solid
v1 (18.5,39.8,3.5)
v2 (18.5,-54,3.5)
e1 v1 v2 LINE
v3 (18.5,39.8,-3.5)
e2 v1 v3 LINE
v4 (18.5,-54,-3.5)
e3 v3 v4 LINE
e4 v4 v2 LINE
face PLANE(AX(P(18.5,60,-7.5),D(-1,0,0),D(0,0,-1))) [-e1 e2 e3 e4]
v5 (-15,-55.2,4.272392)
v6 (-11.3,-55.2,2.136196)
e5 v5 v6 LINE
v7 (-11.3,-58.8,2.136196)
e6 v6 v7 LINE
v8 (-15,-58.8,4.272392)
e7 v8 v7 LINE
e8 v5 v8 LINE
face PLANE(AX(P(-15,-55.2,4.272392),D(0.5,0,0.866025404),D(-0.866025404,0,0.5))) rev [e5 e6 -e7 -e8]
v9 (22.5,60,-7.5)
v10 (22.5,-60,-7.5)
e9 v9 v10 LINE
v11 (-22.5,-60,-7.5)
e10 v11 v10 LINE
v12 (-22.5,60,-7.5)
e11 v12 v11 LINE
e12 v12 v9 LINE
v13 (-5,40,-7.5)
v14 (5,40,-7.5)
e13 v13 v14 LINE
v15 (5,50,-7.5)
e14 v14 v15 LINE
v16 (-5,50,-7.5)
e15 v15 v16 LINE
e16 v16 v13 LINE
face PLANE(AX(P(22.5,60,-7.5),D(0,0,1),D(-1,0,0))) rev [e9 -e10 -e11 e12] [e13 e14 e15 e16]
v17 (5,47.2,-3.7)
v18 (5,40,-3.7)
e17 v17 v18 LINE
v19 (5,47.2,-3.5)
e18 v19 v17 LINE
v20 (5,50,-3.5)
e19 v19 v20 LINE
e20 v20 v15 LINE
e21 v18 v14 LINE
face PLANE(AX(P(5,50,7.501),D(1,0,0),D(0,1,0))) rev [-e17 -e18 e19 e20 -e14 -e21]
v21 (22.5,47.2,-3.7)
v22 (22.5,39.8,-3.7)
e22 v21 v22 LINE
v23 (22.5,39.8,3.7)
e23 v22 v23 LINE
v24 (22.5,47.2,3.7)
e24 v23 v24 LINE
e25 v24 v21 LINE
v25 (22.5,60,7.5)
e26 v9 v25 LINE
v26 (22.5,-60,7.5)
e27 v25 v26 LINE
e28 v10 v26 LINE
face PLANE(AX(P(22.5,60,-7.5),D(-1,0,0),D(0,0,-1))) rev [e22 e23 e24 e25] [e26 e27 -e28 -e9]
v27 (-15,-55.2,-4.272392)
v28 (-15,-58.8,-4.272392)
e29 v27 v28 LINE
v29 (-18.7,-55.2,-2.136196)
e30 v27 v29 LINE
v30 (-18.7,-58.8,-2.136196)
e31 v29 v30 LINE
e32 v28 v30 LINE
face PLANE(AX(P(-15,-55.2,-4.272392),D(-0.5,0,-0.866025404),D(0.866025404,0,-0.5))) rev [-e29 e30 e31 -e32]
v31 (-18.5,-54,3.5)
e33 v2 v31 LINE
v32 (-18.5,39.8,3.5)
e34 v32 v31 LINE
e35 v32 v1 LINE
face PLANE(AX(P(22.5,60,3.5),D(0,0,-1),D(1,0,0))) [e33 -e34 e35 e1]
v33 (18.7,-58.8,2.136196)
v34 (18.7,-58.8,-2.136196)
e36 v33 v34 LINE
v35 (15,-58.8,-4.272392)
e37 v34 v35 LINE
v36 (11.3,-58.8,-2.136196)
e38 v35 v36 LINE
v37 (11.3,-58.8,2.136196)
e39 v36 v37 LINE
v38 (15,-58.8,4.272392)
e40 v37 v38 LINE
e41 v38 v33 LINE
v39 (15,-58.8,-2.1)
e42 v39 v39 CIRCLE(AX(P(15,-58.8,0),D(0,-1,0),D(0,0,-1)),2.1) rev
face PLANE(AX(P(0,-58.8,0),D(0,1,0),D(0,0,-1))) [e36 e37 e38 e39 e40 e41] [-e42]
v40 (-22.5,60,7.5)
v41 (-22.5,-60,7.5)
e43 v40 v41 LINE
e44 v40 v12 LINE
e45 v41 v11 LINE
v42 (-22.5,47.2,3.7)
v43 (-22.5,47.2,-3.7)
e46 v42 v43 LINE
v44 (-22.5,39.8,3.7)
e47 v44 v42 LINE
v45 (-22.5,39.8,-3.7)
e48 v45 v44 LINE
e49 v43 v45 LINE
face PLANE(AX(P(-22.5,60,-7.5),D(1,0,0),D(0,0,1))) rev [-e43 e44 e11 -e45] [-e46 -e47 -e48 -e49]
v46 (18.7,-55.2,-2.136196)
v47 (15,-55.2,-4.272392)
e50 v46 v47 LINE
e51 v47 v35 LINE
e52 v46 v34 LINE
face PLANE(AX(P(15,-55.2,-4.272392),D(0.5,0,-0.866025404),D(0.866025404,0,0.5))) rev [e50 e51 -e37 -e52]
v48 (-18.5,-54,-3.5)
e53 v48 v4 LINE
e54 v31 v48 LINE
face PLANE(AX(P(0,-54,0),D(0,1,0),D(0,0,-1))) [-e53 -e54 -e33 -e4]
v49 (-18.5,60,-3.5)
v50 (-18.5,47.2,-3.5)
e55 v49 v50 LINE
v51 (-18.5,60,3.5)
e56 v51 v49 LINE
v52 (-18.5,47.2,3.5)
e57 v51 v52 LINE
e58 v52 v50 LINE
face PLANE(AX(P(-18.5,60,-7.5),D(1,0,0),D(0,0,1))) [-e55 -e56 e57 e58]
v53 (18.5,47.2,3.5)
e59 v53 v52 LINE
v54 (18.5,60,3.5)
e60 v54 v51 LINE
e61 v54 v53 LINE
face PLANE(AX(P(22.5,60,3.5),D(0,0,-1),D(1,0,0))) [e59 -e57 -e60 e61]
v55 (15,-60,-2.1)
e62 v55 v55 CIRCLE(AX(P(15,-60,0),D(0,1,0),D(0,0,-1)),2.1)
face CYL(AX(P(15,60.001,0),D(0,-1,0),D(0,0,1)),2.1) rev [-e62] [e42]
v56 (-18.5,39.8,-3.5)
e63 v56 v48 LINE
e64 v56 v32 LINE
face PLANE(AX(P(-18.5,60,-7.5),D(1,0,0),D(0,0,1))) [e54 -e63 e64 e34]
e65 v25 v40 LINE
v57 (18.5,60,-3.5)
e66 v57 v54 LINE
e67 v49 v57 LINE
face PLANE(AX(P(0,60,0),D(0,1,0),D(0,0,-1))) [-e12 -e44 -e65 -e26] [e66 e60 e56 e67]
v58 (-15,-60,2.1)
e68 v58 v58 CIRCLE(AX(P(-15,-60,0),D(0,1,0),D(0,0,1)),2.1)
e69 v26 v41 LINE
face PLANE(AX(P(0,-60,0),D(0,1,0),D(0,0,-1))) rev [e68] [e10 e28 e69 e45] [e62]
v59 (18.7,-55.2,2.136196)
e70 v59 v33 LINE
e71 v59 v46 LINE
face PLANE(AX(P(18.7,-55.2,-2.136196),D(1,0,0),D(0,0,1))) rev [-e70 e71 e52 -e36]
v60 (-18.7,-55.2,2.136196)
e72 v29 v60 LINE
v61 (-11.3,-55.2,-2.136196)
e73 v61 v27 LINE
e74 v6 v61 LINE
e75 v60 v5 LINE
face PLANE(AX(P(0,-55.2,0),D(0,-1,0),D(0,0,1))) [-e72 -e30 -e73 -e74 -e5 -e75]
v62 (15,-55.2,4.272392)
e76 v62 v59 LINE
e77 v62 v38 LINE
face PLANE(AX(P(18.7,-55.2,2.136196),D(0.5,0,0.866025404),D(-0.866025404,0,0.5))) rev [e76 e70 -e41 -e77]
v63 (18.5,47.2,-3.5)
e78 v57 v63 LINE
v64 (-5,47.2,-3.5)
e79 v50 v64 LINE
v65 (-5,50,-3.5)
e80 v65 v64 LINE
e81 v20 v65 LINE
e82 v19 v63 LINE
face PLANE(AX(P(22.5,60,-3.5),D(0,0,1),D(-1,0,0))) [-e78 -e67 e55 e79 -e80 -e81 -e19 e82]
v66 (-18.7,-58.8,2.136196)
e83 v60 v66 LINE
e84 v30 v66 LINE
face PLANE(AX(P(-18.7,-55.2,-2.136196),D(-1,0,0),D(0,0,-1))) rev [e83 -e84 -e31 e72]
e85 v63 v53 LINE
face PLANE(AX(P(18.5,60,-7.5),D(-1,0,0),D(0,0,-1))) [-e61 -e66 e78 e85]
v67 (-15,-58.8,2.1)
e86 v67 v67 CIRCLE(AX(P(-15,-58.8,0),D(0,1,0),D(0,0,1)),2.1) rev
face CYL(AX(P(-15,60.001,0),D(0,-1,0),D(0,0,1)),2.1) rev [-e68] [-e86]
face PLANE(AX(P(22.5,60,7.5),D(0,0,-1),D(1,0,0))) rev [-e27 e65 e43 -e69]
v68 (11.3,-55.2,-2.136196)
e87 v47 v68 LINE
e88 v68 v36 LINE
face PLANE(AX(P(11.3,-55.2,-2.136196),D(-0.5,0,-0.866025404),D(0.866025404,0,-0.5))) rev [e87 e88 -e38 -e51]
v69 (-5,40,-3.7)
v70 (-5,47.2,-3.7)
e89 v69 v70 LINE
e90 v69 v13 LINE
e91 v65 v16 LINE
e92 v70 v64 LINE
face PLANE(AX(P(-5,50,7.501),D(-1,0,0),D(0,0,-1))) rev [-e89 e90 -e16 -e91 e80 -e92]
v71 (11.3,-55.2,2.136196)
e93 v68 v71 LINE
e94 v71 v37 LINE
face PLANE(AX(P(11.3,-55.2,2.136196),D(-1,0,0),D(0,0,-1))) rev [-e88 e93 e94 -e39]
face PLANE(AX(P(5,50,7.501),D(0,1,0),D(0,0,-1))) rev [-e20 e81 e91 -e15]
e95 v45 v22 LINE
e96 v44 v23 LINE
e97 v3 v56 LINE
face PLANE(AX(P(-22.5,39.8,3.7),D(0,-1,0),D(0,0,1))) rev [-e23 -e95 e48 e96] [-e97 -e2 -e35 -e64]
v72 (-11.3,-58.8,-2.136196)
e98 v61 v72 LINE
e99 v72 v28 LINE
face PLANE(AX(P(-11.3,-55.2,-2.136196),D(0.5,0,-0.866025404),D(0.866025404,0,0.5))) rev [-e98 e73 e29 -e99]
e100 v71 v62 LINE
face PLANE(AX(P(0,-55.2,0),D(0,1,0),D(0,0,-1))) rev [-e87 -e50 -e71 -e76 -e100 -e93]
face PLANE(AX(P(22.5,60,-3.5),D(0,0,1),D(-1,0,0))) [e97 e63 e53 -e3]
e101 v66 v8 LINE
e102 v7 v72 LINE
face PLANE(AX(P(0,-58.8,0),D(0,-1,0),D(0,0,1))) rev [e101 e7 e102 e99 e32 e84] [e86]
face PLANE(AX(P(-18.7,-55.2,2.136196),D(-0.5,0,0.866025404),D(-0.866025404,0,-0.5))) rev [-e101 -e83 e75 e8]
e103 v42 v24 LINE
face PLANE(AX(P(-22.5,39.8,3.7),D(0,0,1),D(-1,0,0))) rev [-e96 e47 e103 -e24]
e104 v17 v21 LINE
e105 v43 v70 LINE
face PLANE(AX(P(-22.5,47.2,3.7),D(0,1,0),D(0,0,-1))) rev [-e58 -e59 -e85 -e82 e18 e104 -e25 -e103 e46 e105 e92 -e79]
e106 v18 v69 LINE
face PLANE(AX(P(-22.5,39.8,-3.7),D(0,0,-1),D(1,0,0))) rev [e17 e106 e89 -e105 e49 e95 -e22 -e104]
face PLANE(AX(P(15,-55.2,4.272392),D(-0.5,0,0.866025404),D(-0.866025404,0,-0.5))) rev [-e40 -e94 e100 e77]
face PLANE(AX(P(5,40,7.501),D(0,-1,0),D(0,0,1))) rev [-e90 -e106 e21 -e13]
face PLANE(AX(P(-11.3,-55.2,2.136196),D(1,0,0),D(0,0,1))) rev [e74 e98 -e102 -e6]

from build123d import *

# Parameters (mm, degrees)
SKETCH1_W                   = 45
SKETCH1_H                   = 15
BOSS_EXTRUDE1_DEPTH         = 60
SHELL1_T                    = -4
SHELL1_THICKNESS_2_FACE_W   = 7
SHELL1_THICKNESS_2_FACE_H   = 37
SHELL1_THICKNESS_2_DEPTH    = 2
CUT_EXTRUDE3_REACH          = 67.812
SKETCH4_W                   = 10
SKETCH4_H                   = 10
SKETCH5_W                   = 7.4
SKETCH5_H                   = 7.4
CUT_EXTRUDE4_DEPTH          = 76.374067158
CUT_EXTRUDE5_START          = -1.2
CUT_EXTRUDE5_DEPTH          = 3.6
CUT_EXTRUDE6_REACH          = 124.321
SKETCH7_R                   = 2.1
BODY_MOVE_COPY1_START       = -7.5
BODY_MOVE_COPY1_OUTLINE_W   = 10
BODY_MOVE_COPY1_OUTLINE_H   = 10
BODY_MOVE_COPY1_DEPTH       = 4
BODY_MOVE_COPY1_START_2     = 3.7
BODY_MOVE_COPY1_2_OUTLINE_W = 10
BODY_MOVE_COPY1_2_OUTLINE_H = 10
BODY_MOVE_COPY1_2_DEPTH     = 3.8
BODY_MOVE_COPY1_START_3     = 3.5
BODY_MOVE_COPY1_3_OUTLINE_W = 10
BODY_MOVE_COPY1_3_OUTLINE_H = 2.8
BODY_MOVE_COPY1_3_DEPTH     = 0.2


# Read off the part's stored shape, not the designer's step: Body-Move/Copy1
with BuildPart() as part:
    # Sketch1 → Boss-Extrude1 (new, symmetric)
    with BuildSketch(Plane(origin=(0, 0, 0), x_dir=(1, 0, 0), z_dir=(0, 1, 0))):
        Rectangle(SKETCH1_W, SKETCH1_H)
    extrude(amount=BOSS_EXTRUDE1_DEPTH, both=True)

    # Shell1
    shell1_openings = [part.faces().sort_by_distance(p)[0] for p in [
        (0, 60, 0),
    ]]
    offset(amount=SHELL1_T, openings=shell1_openings, kind=Kind.INTERSECTION)

    # Shell1 thickness 2 face (on inner face of the shell) → Shell1 thickness 2 (add)
    with BuildSketch(Plane(origin=(0, -56, 0), x_dir=(0, 0, -1), z_dir=(0, -1, 0))):
        Rectangle(SHELL1_THICKNESS_2_FACE_W, SHELL1_THICKNESS_2_FACE_H)
    extrude(amount=-SHELL1_THICKNESS_2_DEPTH)

    # Sketch4 → Cut-Extrude3 (cut, up to next)
    with BuildSketch(Plane.XY.offset(7.5), mode=Mode.PRIVATE) as cut_extrude3_sk1:
        with Locations((0, 45)):
            Rectangle(SKETCH4_W, SKETCH4_H)
    cut_extrude3_tool1 = extrude(cut_extrude3_sk1.sketch, amount=-CUT_EXTRUDE3_REACH, mode=Mode.PRIVATE) & part.part
    add(cut_extrude3_tool1.solids().sort_by_distance((0, 45, 7.5))[0], mode=Mode.SUBTRACT)

    # Sketch5 → Cut-Extrude4 (cut, through all)
    with BuildSketch(Plane(origin=(22.5, 0, 0), x_dir=(0, 0, -1), z_dir=(1, 0, 0))):
        with Locations((0, 43.5)):
            Rectangle(SKETCH5_W, SKETCH5_H)
    extrude(amount=-CUT_EXTRUDE4_DEPTH, mode=Mode.SUBTRACT)

    # Sketch6 → Cut-Extrude5 (cut)
    with BuildSketch(Plane.XZ.offset(60).offset(CUT_EXTRUDE5_START)):
        Polygon((-15, 4.272391992), (-18.7, 2.136195996), (-18.7, -2.136195996), (-15, -4.272391992), (-11.3, -2.136195996), (-11.3, 2.136195996), align=None)
        Polygon((11.3, 2.136195996), (15, 4.272391992), (18.7, 2.136195996), (18.7, -2.136195996), (15, -4.272391992), (11.3, -2.136195996), align=None)
    extrude(amount=-CUT_EXTRUDE5_DEPTH, mode=Mode.SUBTRACT)

    # Sketch7 → Cut-Extrude6 (cut, up to next)
    with BuildSketch(Plane.XZ.offset(60), mode=Mode.PRIVATE) as cut_extrude6_sk1:
        with Locations(Location((-15, 0, 0), (0, 0, 270))):
            Circle(SKETCH7_R)
    cut_extrude6_tool1 = extrude(cut_extrude6_sk1.sketch, amount=-CUT_EXTRUDE6_REACH, mode=Mode.PRIVATE) & part.part
    # Sketch7 → Cut-Extrude6 (cut, up to next)
    with BuildSketch(Plane.XZ.offset(60), mode=Mode.PRIVATE) as cut_extrude6_sk2:
        with Locations(Location((15, 0, 0), (0, 0, 90))):
            Circle(SKETCH7_R)
    cut_extrude6_tool2 = extrude(cut_extrude6_sk2.sketch, amount=-CUT_EXTRUDE6_REACH, mode=Mode.PRIVATE) & part.part
    add(cut_extrude6_tool1.solids().sort_by_distance((-15, -60, 0))[0], mode=Mode.SUBTRACT)
    add(cut_extrude6_tool2.solids().sort_by_distance((15, -60, 0))[0], mode=Mode.SUBTRACT)

    # Body-Move/Copy1 outline → Body-Move/Copy1 (cut)
    with BuildSketch(Plane.XY.offset(BODY_MOVE_COPY1_START)):
        with Locations((0, 45)):
            Rectangle(BODY_MOVE_COPY1_OUTLINE_W, BODY_MOVE_COPY1_OUTLINE_H)
    extrude(amount=BODY_MOVE_COPY1_DEPTH, mode=Mode.SUBTRACT)

    # Body-Move_Copy1 2 outline → Body-Move_Copy1 2 (add)
    with BuildSketch(Plane.XY.offset(BODY_MOVE_COPY1_START_2)):
        with Locations((0, 45)):
            Rectangle(BODY_MOVE_COPY1_2_OUTLINE_W, BODY_MOVE_COPY1_2_OUTLINE_H)
    extrude(amount=BODY_MOVE_COPY1_2_DEPTH)

    # Body-Move_Copy1 3 outline → Body-Move_Copy1 3 (add)
    with BuildSketch(Plane.XY.offset(BODY_MOVE_COPY1_START_3)):
        with Locations((0, 48.6)):
            Rectangle(BODY_MOVE_COPY1_3_OUTLINE_W, BODY_MOVE_COPY1_3_OUTLINE_H)
    extrude(amount=BODY_MOVE_COPY1_3_DEPTH)


solid = part.part
